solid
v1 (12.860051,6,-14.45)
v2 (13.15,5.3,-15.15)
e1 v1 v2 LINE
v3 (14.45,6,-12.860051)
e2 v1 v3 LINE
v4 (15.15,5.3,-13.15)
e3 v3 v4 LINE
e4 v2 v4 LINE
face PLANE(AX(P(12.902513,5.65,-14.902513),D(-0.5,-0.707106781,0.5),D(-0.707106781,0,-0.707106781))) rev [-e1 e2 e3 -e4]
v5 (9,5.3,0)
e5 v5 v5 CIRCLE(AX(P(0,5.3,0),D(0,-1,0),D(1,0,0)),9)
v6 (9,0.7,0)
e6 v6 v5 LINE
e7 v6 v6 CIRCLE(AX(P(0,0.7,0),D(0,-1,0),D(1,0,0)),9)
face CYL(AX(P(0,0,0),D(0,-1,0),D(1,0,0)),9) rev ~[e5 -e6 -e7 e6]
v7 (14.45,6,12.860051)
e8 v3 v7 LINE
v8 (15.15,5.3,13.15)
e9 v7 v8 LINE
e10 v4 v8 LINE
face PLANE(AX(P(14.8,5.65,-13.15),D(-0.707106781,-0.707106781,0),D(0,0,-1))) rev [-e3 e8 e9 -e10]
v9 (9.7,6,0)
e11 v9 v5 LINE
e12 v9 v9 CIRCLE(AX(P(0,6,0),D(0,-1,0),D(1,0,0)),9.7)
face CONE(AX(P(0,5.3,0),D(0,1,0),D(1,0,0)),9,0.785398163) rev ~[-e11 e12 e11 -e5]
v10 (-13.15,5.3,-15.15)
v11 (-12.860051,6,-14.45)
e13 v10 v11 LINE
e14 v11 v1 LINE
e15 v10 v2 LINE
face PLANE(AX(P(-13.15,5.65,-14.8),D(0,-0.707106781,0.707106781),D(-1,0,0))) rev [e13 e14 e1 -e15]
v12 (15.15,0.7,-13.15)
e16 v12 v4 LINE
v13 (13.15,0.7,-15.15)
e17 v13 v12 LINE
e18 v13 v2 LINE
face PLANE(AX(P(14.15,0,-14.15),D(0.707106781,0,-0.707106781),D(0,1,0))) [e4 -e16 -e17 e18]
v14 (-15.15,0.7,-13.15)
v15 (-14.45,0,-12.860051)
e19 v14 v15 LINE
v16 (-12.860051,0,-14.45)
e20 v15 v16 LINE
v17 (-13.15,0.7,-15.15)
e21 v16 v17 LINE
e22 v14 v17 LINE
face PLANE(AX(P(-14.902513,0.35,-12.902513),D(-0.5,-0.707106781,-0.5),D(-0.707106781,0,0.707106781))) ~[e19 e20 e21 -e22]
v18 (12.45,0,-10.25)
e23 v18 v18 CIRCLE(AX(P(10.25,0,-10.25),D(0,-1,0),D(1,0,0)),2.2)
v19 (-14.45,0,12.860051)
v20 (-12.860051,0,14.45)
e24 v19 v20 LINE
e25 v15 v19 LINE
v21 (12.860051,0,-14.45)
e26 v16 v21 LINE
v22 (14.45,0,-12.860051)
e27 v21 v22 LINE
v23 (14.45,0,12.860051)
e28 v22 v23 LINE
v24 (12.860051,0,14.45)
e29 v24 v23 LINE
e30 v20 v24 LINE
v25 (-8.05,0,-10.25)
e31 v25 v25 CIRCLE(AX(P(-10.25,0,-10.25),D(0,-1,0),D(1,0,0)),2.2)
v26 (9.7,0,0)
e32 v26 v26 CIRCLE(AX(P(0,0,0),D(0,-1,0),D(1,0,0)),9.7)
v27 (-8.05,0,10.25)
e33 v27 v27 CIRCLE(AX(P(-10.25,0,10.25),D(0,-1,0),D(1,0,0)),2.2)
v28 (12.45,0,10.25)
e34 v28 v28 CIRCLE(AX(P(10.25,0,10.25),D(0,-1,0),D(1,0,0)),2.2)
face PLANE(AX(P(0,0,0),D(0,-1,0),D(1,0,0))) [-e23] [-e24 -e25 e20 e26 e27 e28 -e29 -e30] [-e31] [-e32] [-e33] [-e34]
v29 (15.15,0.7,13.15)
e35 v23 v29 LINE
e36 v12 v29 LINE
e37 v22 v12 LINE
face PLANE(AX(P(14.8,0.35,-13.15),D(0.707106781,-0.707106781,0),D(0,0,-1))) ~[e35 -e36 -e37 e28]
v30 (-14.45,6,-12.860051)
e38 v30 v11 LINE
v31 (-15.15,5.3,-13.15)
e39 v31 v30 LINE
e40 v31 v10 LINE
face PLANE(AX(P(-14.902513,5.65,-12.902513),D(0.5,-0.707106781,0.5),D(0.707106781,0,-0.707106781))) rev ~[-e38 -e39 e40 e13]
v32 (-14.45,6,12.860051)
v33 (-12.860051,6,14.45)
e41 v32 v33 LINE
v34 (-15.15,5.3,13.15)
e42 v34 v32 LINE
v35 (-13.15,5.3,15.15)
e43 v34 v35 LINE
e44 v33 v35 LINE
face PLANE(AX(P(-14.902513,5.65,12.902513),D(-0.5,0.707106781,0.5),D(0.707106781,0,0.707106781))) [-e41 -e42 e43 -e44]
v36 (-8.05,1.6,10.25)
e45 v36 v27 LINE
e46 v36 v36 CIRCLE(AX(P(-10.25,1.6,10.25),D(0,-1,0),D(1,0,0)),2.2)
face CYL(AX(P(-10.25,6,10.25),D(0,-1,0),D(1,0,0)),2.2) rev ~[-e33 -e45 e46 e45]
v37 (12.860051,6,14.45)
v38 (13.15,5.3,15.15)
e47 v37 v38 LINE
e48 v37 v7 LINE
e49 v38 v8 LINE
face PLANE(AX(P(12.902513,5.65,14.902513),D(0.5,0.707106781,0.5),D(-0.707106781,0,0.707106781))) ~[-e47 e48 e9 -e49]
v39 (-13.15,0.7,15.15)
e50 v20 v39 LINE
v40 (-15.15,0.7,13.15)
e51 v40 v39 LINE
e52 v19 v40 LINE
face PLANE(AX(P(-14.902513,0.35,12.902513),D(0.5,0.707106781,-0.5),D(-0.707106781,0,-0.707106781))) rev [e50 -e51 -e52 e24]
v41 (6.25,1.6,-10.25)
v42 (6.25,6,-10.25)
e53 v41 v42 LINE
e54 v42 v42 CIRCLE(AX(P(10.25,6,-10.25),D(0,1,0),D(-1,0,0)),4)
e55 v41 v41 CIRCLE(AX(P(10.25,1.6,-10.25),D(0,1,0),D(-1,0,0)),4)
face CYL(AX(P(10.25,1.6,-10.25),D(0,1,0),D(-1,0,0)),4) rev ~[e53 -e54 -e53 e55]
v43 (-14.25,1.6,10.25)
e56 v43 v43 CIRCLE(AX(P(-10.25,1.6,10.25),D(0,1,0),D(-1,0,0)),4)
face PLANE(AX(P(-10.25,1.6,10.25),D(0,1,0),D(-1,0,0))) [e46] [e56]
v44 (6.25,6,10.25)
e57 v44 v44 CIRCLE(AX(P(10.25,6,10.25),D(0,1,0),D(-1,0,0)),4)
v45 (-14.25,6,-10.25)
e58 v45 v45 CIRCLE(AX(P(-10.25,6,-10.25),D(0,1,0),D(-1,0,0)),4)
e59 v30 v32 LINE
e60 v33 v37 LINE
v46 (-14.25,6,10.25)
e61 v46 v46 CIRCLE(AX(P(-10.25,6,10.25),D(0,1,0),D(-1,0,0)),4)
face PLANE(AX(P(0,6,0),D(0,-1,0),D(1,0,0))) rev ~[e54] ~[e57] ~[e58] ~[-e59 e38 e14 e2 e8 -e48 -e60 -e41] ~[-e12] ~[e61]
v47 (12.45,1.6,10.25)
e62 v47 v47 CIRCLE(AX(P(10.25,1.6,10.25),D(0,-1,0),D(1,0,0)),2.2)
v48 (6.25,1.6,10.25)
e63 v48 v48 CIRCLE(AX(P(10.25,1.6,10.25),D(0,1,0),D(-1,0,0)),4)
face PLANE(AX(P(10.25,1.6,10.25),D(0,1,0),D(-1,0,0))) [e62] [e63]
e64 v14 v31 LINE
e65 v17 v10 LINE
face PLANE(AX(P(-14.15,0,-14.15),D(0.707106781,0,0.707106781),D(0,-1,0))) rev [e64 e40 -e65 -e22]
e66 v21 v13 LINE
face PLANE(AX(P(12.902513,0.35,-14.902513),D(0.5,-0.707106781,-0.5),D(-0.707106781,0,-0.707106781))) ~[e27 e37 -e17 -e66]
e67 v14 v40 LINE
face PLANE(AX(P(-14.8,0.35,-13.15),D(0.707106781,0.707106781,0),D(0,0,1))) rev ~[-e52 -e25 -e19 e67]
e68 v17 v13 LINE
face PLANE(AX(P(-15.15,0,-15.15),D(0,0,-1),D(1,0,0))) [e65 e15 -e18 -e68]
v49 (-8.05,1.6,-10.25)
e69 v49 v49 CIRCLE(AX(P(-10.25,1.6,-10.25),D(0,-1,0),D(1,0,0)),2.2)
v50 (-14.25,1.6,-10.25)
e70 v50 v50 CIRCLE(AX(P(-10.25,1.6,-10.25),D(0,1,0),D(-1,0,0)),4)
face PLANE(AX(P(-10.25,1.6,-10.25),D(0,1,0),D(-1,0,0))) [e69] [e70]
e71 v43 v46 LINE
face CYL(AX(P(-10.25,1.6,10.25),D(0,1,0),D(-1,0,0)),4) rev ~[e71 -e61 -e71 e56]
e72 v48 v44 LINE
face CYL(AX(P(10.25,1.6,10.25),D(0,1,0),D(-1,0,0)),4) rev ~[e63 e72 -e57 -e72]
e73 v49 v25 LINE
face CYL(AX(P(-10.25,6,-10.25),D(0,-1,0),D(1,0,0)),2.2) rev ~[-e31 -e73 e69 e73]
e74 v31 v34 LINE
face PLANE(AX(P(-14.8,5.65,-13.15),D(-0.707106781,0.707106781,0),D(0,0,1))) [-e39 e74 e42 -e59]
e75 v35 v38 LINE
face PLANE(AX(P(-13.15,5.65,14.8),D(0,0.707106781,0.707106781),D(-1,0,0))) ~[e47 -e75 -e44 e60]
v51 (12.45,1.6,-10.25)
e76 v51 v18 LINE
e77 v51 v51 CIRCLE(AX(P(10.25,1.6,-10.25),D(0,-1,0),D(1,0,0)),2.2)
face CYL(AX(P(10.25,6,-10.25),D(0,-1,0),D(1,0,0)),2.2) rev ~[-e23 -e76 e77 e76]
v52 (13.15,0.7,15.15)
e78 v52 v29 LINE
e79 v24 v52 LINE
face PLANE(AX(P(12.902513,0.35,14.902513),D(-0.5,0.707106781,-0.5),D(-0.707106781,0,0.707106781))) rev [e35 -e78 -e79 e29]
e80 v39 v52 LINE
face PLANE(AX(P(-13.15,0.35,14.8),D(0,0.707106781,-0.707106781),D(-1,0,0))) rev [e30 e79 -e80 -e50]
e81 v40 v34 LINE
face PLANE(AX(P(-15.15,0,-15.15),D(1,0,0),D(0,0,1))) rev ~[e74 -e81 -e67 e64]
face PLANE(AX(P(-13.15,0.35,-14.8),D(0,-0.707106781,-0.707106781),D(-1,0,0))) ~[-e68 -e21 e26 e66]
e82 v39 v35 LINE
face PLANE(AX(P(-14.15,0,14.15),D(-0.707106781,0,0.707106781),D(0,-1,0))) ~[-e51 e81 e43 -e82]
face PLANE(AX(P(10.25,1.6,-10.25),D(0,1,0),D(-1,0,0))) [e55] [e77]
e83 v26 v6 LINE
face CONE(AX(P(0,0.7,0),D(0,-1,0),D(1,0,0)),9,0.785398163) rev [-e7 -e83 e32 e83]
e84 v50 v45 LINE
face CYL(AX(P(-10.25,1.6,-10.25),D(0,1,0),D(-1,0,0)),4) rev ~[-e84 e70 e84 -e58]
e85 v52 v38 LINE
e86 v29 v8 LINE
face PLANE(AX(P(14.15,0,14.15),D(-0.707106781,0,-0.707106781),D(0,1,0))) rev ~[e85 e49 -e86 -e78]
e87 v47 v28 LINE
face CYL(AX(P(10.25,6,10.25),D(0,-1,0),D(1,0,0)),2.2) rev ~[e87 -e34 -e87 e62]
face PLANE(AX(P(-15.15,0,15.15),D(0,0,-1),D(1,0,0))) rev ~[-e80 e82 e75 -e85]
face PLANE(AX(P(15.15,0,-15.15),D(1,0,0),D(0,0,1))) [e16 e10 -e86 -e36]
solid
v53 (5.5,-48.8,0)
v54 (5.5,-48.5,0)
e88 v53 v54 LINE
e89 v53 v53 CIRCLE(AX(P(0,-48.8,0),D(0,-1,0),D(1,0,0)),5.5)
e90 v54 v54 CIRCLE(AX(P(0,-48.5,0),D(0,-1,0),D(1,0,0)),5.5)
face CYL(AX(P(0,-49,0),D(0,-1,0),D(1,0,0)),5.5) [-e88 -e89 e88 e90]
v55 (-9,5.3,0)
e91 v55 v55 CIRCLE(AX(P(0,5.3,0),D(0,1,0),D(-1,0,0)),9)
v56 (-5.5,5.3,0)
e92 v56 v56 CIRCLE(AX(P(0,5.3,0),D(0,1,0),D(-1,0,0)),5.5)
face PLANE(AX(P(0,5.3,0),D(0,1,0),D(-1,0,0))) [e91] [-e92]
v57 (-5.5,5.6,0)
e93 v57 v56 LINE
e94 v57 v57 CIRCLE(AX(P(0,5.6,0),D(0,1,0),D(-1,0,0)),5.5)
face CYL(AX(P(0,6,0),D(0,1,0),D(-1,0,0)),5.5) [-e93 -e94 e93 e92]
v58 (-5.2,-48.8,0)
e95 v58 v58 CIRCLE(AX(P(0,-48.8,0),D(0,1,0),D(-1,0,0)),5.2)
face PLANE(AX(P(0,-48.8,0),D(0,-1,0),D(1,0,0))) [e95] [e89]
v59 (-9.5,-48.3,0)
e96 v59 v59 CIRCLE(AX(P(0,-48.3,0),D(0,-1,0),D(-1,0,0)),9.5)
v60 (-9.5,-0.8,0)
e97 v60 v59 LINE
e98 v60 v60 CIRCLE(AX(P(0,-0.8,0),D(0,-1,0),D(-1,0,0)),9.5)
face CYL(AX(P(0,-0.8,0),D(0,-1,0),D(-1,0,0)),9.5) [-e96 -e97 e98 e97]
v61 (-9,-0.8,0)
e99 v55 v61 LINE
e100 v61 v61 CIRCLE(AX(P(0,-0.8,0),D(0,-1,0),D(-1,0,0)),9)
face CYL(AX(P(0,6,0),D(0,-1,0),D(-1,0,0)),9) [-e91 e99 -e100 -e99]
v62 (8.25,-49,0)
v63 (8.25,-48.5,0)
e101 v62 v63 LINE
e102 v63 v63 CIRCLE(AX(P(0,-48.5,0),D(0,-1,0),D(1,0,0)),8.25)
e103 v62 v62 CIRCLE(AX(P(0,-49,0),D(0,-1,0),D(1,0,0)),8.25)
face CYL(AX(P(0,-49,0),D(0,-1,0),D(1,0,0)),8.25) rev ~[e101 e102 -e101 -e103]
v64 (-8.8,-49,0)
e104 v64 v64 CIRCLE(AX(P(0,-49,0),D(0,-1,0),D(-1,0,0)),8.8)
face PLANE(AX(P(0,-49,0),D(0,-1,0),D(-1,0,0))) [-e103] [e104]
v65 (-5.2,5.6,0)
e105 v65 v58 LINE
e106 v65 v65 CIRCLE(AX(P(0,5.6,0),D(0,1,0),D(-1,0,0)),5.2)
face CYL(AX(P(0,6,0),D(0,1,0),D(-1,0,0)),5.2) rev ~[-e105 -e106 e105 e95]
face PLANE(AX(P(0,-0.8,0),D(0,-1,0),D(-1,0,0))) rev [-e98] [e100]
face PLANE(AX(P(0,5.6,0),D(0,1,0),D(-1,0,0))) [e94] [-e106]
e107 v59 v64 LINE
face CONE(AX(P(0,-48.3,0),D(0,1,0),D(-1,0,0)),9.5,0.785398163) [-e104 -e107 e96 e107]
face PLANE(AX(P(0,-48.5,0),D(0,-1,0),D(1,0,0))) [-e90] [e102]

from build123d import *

# Parameters (mm, degrees)
F0_W           = 30.3
F0_H           = 30.3
F0_R           = 9
F1_DEPTH       = 6
F3_SIZE        = 2
F5_SIZE        = 0.7
F5_2_SIZE      = 0.7
F7_D           = 4.4
F7_CBORE_D     = 8
F7_CBORE_DEPTH = 4.4
F9_R           = 9
F9_R_2         = 5.5
F10_DEPTH      = 0.7
F9_R_3         = 5.2
F11_DEPTH      = 0.4
F12_DEPTH      = 55
F13_R          = 8.25
F13_R_2        = 5.5
F14_DEPTH      = 0.5
F13_R_3        = 5.2
F15_DEPTH      = 0.2


# Not quite as in the source:
# - two fillets or chamfers of one size are made in one step


with BuildPart() as f1:
    # F0 (on Front) → F1 (new body)
    with BuildSketch(Plane.XZ):
        Rectangle(F0_W, F0_H)
        Circle(F0_R, mode=Mode.SUBTRACT)
    extrude(amount=-F1_DEPTH)

    # F3
    f3_edges = [f1.edges().sort_by_distance(p)[0] for p in [
        (15.15, 3, 15.15),
        (-15.15, 3, 15.15),
        (15.15, 3, -15.15),
        (-15.15, 3, -15.15),
    ]]
    chamfer(f3_edges, length=F3_SIZE)

    # F5
    f5_edges = [f1.edges().sort_by_distance(p)[0] for p in [
        (9, 3, 0),
        (-9, 0, 0),
        (-9, 6, 0),
        (0, 0, 15.15),
        (-14.15, 0, 14.15),
        (-15.15, 0, 0),
        (-14.15, 0, -14.15),
        (0, 0, -15.15),
        (14.15, 0, -14.15),
        (15.15, 0, 0),
        (14.15, 0, 14.15),
        (15.15, 6, 0),
        (14.15, 6, 14.15),
        (0, 6, 15.15),
        (-14.15, 6, 14.15),
        (-15.15, 6, 0),
        (-14.15, 6, -14.15),
        (0, 6, -15.15),
        (14.15, 6, -14.15),
    ]]
    chamfer(f5_edges, length=F5_SIZE)

    # F7 (through all)
    with Locations(Plane(origin=(0, 6, 0), x_dir=(-1, 0, 0), z_dir=(0, 1, 0))):
        with Locations((-10.25, 10.25), (10.25, 10.25), (10.25, -10.25), (-10.25, -10.25)):
            CounterBoreHole(F7_D / 2, F7_CBORE_D / 2, F7_CBORE_DEPTH)


with BuildPart() as f4:
    # F2 (on Top) → F4 (revolve)
    with BuildSketch(Plane.XY):
        Polygon((0, -49), (0, 6), (-9, 6), (-9, -0.8), (-9.5, -0.8), (-9.5, -49), align=None)
    revolve(axis=Axis((0, 15.3594217002, 0), (0, -1, 0)))

    # F5#2
    f5_2_edges = [f4.edges().sort_by_distance(p)[0] for p in [
        (9.5, -49, 0),
    ]]
    chamfer(f5_2_edges, length=F5_2_SIZE)

    # F9 (on face) → F10 (cut)
    with BuildSketch(Plane(origin=(0, 6, 0), x_dir=(-1, 0, 0), z_dir=(0, 1, 0))):
        Circle(F9_R)
        Circle(F9_R_2, mode=Mode.SUBTRACT)
    extrude(amount=-F10_DEPTH, mode=Mode.SUBTRACT)

    # F9 (on face) → F11 (cut)
    with BuildSketch(Plane(origin=(0, 6, 0), x_dir=(-1, 0, 0), z_dir=(0, 1, 0))):
        Circle(F9_R_2)
        Circle(F9_R_3, mode=Mode.SUBTRACT)
    extrude(amount=-F11_DEPTH, mode=Mode.SUBTRACT)

    # F9 (on face) → F12 (cut, through all)
    with BuildSketch(Plane(origin=(0, 6, 0), x_dir=(-1, 0, 0), z_dir=(0, 1, 0))):
        Circle(F9_R_3)
    extrude(amount=-F12_DEPTH, mode=Mode.SUBTRACT)

    # F13 (on face) → F14 (cut)
    with BuildSketch(Plane.XZ.offset(49)):
        Circle(F13_R)
        Circle(F13_R_2, mode=Mode.SUBTRACT)
    extrude(amount=-F14_DEPTH, mode=Mode.SUBTRACT)

    # F13 (on face) → F15 (cut)
    with BuildSketch(Plane.XZ.offset(49)):
        Circle(F13_R_2)
        Circle(F13_R_3, mode=Mode.SUBTRACT)
    extrude(amount=-F15_DEPTH, mode=Mode.SUBTRACT)


solid = Compound([f1.part, f4.part])
